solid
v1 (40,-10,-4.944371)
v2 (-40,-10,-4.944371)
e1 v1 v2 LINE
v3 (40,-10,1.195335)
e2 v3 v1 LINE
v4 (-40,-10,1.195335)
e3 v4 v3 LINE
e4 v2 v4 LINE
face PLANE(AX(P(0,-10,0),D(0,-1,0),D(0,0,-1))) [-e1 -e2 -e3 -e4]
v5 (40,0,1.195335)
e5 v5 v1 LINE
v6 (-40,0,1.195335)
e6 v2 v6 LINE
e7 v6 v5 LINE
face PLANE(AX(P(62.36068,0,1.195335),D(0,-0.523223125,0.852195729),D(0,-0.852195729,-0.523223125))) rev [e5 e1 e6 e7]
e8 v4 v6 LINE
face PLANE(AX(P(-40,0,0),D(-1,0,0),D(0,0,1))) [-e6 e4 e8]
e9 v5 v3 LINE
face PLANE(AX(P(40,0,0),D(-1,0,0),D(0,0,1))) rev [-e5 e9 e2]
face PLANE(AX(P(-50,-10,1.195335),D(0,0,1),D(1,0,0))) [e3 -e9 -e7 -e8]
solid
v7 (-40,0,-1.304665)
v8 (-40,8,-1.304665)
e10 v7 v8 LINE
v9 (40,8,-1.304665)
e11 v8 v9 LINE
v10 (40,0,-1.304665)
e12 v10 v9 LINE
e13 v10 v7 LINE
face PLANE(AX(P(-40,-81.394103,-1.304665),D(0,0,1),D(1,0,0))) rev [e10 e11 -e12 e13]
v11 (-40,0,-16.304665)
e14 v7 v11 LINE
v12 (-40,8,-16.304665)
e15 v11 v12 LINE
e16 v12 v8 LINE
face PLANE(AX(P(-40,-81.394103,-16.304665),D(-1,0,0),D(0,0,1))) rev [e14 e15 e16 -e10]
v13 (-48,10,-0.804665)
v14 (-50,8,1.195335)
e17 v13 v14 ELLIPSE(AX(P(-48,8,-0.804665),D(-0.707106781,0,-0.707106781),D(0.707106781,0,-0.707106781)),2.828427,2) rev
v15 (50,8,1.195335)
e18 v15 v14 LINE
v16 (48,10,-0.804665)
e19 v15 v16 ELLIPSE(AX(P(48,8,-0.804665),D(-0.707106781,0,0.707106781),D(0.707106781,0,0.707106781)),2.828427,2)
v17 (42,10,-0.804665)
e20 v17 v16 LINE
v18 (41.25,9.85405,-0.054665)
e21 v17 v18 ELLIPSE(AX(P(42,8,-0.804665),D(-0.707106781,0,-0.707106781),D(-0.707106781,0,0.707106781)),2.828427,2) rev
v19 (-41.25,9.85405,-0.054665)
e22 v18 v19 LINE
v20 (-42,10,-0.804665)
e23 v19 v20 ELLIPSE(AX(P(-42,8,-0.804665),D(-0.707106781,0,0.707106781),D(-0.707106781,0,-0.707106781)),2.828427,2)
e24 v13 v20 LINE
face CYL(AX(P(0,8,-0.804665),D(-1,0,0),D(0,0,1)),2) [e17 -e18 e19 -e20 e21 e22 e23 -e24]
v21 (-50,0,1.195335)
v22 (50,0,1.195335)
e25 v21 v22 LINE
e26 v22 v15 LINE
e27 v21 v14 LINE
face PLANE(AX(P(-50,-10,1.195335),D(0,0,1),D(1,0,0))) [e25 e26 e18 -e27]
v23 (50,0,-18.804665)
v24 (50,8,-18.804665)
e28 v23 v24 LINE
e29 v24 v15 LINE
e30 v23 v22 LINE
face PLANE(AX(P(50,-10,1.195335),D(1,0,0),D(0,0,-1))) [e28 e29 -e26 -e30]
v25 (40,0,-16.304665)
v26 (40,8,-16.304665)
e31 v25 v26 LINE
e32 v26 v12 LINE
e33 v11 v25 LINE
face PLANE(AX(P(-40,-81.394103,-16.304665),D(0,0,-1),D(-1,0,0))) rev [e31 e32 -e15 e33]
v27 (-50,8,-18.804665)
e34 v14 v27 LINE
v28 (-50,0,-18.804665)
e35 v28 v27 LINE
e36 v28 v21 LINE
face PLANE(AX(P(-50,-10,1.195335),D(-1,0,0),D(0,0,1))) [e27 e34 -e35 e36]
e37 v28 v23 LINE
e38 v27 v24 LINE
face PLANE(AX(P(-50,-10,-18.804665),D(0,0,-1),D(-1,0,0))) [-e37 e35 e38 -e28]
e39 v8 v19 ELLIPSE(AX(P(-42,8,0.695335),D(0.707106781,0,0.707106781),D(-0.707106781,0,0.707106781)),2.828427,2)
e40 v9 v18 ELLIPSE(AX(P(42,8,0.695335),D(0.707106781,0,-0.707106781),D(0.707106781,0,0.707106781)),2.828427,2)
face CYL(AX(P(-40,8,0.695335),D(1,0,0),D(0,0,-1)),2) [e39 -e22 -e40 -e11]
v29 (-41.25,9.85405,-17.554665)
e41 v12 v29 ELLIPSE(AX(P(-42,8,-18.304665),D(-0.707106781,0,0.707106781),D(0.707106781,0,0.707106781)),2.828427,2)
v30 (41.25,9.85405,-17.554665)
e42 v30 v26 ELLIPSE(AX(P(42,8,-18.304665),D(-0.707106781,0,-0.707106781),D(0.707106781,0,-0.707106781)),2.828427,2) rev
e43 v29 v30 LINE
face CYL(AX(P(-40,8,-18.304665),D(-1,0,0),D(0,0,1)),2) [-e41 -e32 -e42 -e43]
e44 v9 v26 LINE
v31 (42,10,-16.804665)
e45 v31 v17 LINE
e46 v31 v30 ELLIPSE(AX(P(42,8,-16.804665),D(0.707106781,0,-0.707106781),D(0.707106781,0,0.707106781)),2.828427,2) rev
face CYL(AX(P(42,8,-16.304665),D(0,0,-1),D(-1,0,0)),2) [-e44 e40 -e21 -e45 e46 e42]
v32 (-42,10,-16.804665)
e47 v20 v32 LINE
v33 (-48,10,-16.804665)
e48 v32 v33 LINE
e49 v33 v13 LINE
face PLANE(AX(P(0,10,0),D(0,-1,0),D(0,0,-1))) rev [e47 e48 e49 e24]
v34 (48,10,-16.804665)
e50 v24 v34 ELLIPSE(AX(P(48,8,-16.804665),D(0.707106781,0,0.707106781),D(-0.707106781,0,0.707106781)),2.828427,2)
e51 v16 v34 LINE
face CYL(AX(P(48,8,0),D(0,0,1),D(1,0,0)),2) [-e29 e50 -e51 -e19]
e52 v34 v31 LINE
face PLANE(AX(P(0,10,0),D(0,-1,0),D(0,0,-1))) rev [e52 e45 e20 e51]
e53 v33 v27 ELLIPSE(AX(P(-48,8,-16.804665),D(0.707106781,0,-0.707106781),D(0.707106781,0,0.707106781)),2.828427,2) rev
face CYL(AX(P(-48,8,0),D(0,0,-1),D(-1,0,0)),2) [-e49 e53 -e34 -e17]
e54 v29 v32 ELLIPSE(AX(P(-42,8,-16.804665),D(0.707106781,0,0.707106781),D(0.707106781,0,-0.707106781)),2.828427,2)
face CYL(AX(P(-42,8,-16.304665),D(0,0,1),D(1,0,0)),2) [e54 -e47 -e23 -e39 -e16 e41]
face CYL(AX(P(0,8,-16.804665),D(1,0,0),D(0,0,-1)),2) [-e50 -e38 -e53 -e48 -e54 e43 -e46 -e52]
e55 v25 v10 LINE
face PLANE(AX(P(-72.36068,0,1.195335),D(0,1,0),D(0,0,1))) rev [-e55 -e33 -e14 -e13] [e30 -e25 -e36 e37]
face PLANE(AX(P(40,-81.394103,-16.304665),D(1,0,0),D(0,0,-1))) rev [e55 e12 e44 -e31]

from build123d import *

# Parameters (mm, degrees)
BOSS_EXTRUDE1_DEPTH      = 10
BOSS_EXTRUDE1_DEPTH_BACK = 10
SKETCH1_W                = 100
SKETCH1_H                = 20
CUT_EXTRUDE1_DEPTH       = 100
SKETCH3_W                = 80
SKETCH3_H                = 15
CUT_EXTRUDE2_DEPTH       = 10
FILLET3_R                = 2
CUT_EXTRUDE4_DEPTH       = 10
CUT_EXTRUDE5_DEPTH       = 10
CUT_EXTRUDE6_DEPTH       = 80


with BuildPart() as part:
    # Sketch1 → Boss-Extrude1 (new, two sides: drawn at the far end of the back side and taken through both)
    with BuildSketch(Plane(origin=(0, 0, 0), x_dir=(1, 0, 0), z_dir=(0, 1, 0)).offset(-BOSS_EXTRUDE1_DEPTH_BACK)):
        with Locations((0, 8.804664723)):
            Rectangle(SKETCH1_W, SKETCH1_H)
    extrude(amount=BOSS_EXTRUDE1_DEPTH + BOSS_EXTRUDE1_DEPTH_BACK)

    # Sketch2 → Cut-Extrude1 (cut)
    with BuildSketch(Plane(origin=(50, 0, 0), x_dir=(0, 0, -1), z_dir=(1, 0, 0))):
        Polygon((-1.195335277, 0), (18.804664723, 0), (18.804664723, -10), align=None)
    extrude(amount=-CUT_EXTRUDE1_DEPTH, mode=Mode.SUBTRACT)


with BuildPart() as cut_extrude1_piece_1:
    # of the separate pieces the step leaves, piece 1, a body of its own (cut_extrude1_pieces)
    add(part.part.solids().sort_by_distance((-50, 10, 1.195335277))[0])

    # Sketch3 → Cut-Extrude2 (cut)
    with BuildSketch(Plane(origin=(0, 10, 0), x_dir=(1, 0, 0), z_dir=(0, 1, 0))):
        with Locations((0, 8.804664723)):
            Rectangle(SKETCH3_W, SKETCH3_H)
    extrude(amount=-CUT_EXTRUDE2_DEPTH, mode=Mode.SUBTRACT)

    # Fillet3
    # the kernel refuses this fillet: 2 mm, written as the material it takes off along each edge
    with BuildSketch(Plane(origin=(40, 10, -16.304664723), x_dir=(1, 0, 0), z_dir=(0, 0, 1)), Plane(origin=(-40, 10, -1.304664723), x_dir=(-1, 0, 0), z_dir=(0, 0, -1))) as fillet3_piece_1:
        with BuildLine():
            CenterArc((FILLET3_R, -FILLET3_R), FILLET3_R, 90, 90)
            Line((0, -FILLET3_R), (-FILLET3_R * 0.02, -FILLET3_R))
            Line((-FILLET3_R * 0.02, -FILLET3_R), (-FILLET3_R * 0.02, FILLET3_R * 0.02))
            Line((-FILLET3_R * 0.02, FILLET3_R * 0.02), (FILLET3_R, FILLET3_R * 0.02))
            Line((FILLET3_R, FILLET3_R * 0.02), (FILLET3_R, 0))
        make_face()
    extrude(amount=15, mode=Mode.SUBTRACT)
    with BuildSketch(Plane(origin=(-40, 10, -16.304664723), x_dir=(0, 0, -1), z_dir=(1, 0, 0)), Plane(origin=(40, 10, -1.304664723), x_dir=(0, 0, 1), z_dir=(-1, 0, 0))) as fillet3_piece_2:
        with BuildLine():
            CenterArc((FILLET3_R, -FILLET3_R), FILLET3_R, 90, 90)
            Line((0, -FILLET3_R), (-FILLET3_R * 0.02, -FILLET3_R))
            Line((-FILLET3_R * 0.02, -FILLET3_R), (-FILLET3_R * 0.02, FILLET3_R * 0.02))
            Line((-FILLET3_R * 0.02, FILLET3_R * 0.02), (FILLET3_R, FILLET3_R * 0.02))
            Line((FILLET3_R, FILLET3_R * 0.02), (FILLET3_R, 0))
        make_face()
    extrude(amount=80, mode=Mode.SUBTRACT)
    with BuildSketch(Plane(origin=(50, 10, 1.195335277), x_dir=(0, -1, 0), z_dir=(0, 0, -1)), Plane(origin=(-50, 10, -18.804664723), x_dir=(0, -1, 0), z_dir=(0, 0, 1))) as fillet3_piece_3:
        with BuildLine():
            CenterArc((FILLET3_R, FILLET3_R), FILLET3_R, 180, 90)
            Line((0, FILLET3_R), (-FILLET3_R * 0.02, FILLET3_R))
            Line((-FILLET3_R * 0.02, FILLET3_R), (-FILLET3_R * 0.02, -FILLET3_R * 0.02))
            Line((-FILLET3_R * 0.02, -FILLET3_R * 0.02), (FILLET3_R, -FILLET3_R * 0.02))
            Line((FILLET3_R, -FILLET3_R * 0.02), (FILLET3_R, 0))
        make_face()
    extrude(amount=20, mode=Mode.SUBTRACT)
    with BuildSketch(Plane(origin=(50, 10, -18.804664723), x_dir=(0, 0, 1), z_dir=(-1, 0, 0))) as fillet3_piece_4:
        with BuildLine():
            CenterArc((FILLET3_R, -FILLET3_R), FILLET3_R, 90, 90)
            Line((0, -FILLET3_R), (-FILLET3_R * 0.02, -FILLET3_R))
            Line((-FILLET3_R * 0.02, -FILLET3_R), (-FILLET3_R * 0.02, FILLET3_R * 0.02))
            Line((-FILLET3_R * 0.02, FILLET3_R * 0.02), (FILLET3_R, FILLET3_R * 0.02))
            Line((FILLET3_R, FILLET3_R * 0.02), (FILLET3_R, 0))
        make_face()
    extrude(amount=100, mode=Mode.SUBTRACT)
    with BuildSketch(Plane(origin=(-50, 10, 1.195335277), x_dir=(0, -1, 0), z_dir=(1, 0, 0))) as fillet3_piece_5:
        with BuildLine():
            CenterArc((FILLET3_R, FILLET3_R), FILLET3_R, 180, 90)
            Line((0, FILLET3_R), (-FILLET3_R * 0.02, FILLET3_R))
            Line((-FILLET3_R * 0.02, FILLET3_R), (-FILLET3_R * 0.02, -FILLET3_R * 0.02))
            Line((-FILLET3_R * 0.02, -FILLET3_R * 0.02), (FILLET3_R, -FILLET3_R * 0.02))
            Line((FILLET3_R, -FILLET3_R * 0.02), (FILLET3_R, 0))
        make_face()
    extrude(amount=100, mode=Mode.SUBTRACT)
    with BuildSketch(Plane(origin=(40, 10, -21.304664723), x_dir=(1, 0, 0), z_dir=(0, 0, 1))) as fillet3_piece_6a_section:
        with BuildLine():
            CenterArc((FILLET3_R, -FILLET3_R), FILLET3_R, 90, 90)
            Line((0, -FILLET3_R), (-FILLET3_R * 0.02, -FILLET3_R))
            Line((-FILLET3_R * 0.02, -FILLET3_R), (-FILLET3_R * 0.02, FILLET3_R * 0.02))
            Line((-FILLET3_R * 0.02, FILLET3_R * 0.02), (FILLET3_R, FILLET3_R * 0.02))
            Line((FILLET3_R, FILLET3_R * 0.02), (FILLET3_R, 0))
        make_face()
    fillet3_piece_6a = extrude(amount=20, mode=Mode.PRIVATE)
    fillet3_piece_6a = split(fillet3_piece_6a, bisect_by=Plane(origin=(40.452790229, 9.547209771, -16.304664723), z_dir=(0, 0, -1)), keep=Keep.TOP, mode=Mode.PRIVATE)
    with BuildSketch(Plane(origin=(-40, 10, -16.304664723), x_dir=(0, 0, -1), z_dir=(1, 0, 0))) as fillet3_piece_6b_section:
        with BuildLine():
            CenterArc((FILLET3_R, -FILLET3_R), FILLET3_R, 90, 90)
            Line((0, -FILLET3_R), (-FILLET3_R * 0.02, -FILLET3_R))
            Line((-FILLET3_R * 0.02, -FILLET3_R), (-FILLET3_R * 0.02, FILLET3_R * 0.02))
            Line((-FILLET3_R * 0.02, FILLET3_R * 0.02), (FILLET3_R, FILLET3_R * 0.02))
            Line((FILLET3_R, FILLET3_R * 0.02), (FILLET3_R, 0))
        make_face()
    fillet3_piece_6b = extrude(amount=85, mode=Mode.PRIVATE)
    fillet3_piece_6b = split(fillet3_piece_6b, bisect_by=Plane(origin=(40, 9.547209771, -16.757454952), z_dir=(1, 0, 0)), keep=Keep.TOP, mode=Mode.PRIVATE)
    fillet3_piece_6 = fillet3_piece_6a & fillet3_piece_6b
    add(fillet3_piece_6, mode=Mode.SUBTRACT)
    with BuildSketch(Plane(origin=(45, 10, -1.304664723), x_dir=(0, 0, 1), z_dir=(-1, 0, 0))) as fillet3_piece_7a_section:
        with BuildLine():
            CenterArc((FILLET3_R, -FILLET3_R), FILLET3_R, 90, 90)
            Line((0, -FILLET3_R), (-FILLET3_R * 0.02, -FILLET3_R))
            Line((-FILLET3_R * 0.02, -FILLET3_R), (-FILLET3_R * 0.02, FILLET3_R * 0.02))
            Line((-FILLET3_R * 0.02, FILLET3_R * 0.02), (FILLET3_R, FILLET3_R * 0.02))
            Line((FILLET3_R, FILLET3_R * 0.02), (FILLET3_R, 0))
        make_face()
    fillet3_piece_7a = extrude(amount=85, mode=Mode.PRIVATE)
    fillet3_piece_7a = split(fillet3_piece_7a, bisect_by=Plane(origin=(40, 9.547209771, -0.851874494), z_dir=(1, 0, 0)), keep=Keep.TOP, mode=Mode.PRIVATE)
    with BuildSketch(Plane(origin=(40, 10, -16.304664723), x_dir=(1, 0, 0), z_dir=(0, 0, 1))) as fillet3_piece_7b_section:
        with BuildLine():
            CenterArc((FILLET3_R, -FILLET3_R), FILLET3_R, 90, 90)
            Line((0, -FILLET3_R), (-FILLET3_R * 0.02, -FILLET3_R))
            Line((-FILLET3_R * 0.02, -FILLET3_R), (-FILLET3_R * 0.02, FILLET3_R * 0.02))
            Line((-FILLET3_R * 0.02, FILLET3_R * 0.02), (FILLET3_R, FILLET3_R * 0.02))
            Line((FILLET3_R, FILLET3_R * 0.02), (FILLET3_R, 0))
        make_face()
    fillet3_piece_7b = extrude(amount=20, mode=Mode.PRIVATE)
    fillet3_piece_7b = split(fillet3_piece_7b, bisect_by=Plane(origin=(40.452790229, 9.547209771, -1.304664723), z_dir=(0, 0, 1)), keep=Keep.TOP, mode=Mode.PRIVATE)
    fillet3_piece_7 = fillet3_piece_7a & fillet3_piece_7b
    add(fillet3_piece_7, mode=Mode.SUBTRACT)
    with BuildSketch(Plane(origin=(-40, 10, -1.304664723), x_dir=(-1, 0, 0), z_dir=(0, 0, -1))) as fillet3_piece_8a_section:
        with BuildLine():
            CenterArc((FILLET3_R, -FILLET3_R), FILLET3_R, 90, 90)
            Line((0, -FILLET3_R), (-FILLET3_R * 0.02, -FILLET3_R))
            Line((-FILLET3_R * 0.02, -FILLET3_R), (-FILLET3_R * 0.02, FILLET3_R * 0.02))
            Line((-FILLET3_R * 0.02, FILLET3_R * 0.02), (FILLET3_R, FILLET3_R * 0.02))
            Line((FILLET3_R, FILLET3_R * 0.02), (FILLET3_R, 0))
        make_face()
    fillet3_piece_8a = extrude(amount=20, mode=Mode.PRIVATE)
    fillet3_piece_8a = split(fillet3_piece_8a, bisect_by=Plane(origin=(-40.452790229, 9.547209771, -16.304664723), z_dir=(0, 0, -1)), keep=Keep.TOP, mode=Mode.PRIVATE)
    with BuildSketch(Plane(origin=(-45, 10, -16.304664723), x_dir=(0, 0, -1), z_dir=(1, 0, 0))) as fillet3_piece_8b_section:
        with BuildLine():
            CenterArc((FILLET3_R, -FILLET3_R), FILLET3_R, 90, 90)
            Line((0, -FILLET3_R), (-FILLET3_R * 0.02, -FILLET3_R))
            Line((-FILLET3_R * 0.02, -FILLET3_R), (-FILLET3_R * 0.02, FILLET3_R * 0.02))
            Line((-FILLET3_R * 0.02, FILLET3_R * 0.02), (FILLET3_R, FILLET3_R * 0.02))
            Line((FILLET3_R, FILLET3_R * 0.02), (FILLET3_R, 0))
        make_face()
    fillet3_piece_8b = extrude(amount=85, mode=Mode.PRIVATE)
    fillet3_piece_8b = split(fillet3_piece_8b, bisect_by=Plane(origin=(-40, 9.547209771, -16.757454952), z_dir=(-1, 0, 0)), keep=Keep.TOP, mode=Mode.PRIVATE)
    fillet3_piece_8 = fillet3_piece_8a & fillet3_piece_8b
    add(fillet3_piece_8, mode=Mode.SUBTRACT)
    with BuildSketch(Plane(origin=(-40, 10, 3.695335277), x_dir=(-1, 0, 0), z_dir=(0, 0, -1))) as fillet3_piece_9a_section:
        with BuildLine():
            CenterArc((FILLET3_R, -FILLET3_R), FILLET3_R, 90, 90)
            Line((0, -FILLET3_R), (-FILLET3_R * 0.02, -FILLET3_R))
            Line((-FILLET3_R * 0.02, -FILLET3_R), (-FILLET3_R * 0.02, FILLET3_R * 0.02))
            Line((-FILLET3_R * 0.02, FILLET3_R * 0.02), (FILLET3_R, FILLET3_R * 0.02))
            Line((FILLET3_R, FILLET3_R * 0.02), (FILLET3_R, 0))
        make_face()
    fillet3_piece_9a = extrude(amount=20, mode=Mode.PRIVATE)
    fillet3_piece_9a = split(fillet3_piece_9a, bisect_by=Plane(origin=(-40.452790229, 9.547209771, -1.304664723), z_dir=(0, 0, 1)), keep=Keep.TOP, mode=Mode.PRIVATE)
    with BuildSketch(Plane(origin=(40, 10, -1.304664723), x_dir=(0, 0, 1), z_dir=(-1, 0, 0))) as fillet3_piece_9b_section:
        with BuildLine():
            CenterArc((FILLET3_R, -FILLET3_R), FILLET3_R, 90, 90)
            Line((0, -FILLET3_R), (-FILLET3_R * 0.02, -FILLET3_R))
            Line((-FILLET3_R * 0.02, -FILLET3_R), (-FILLET3_R * 0.02, FILLET3_R * 0.02))
            Line((-FILLET3_R * 0.02, FILLET3_R * 0.02), (FILLET3_R, FILLET3_R * 0.02))
            Line((FILLET3_R, FILLET3_R * 0.02), (FILLET3_R, 0))
        make_face()
    fillet3_piece_9b = extrude(amount=85, mode=Mode.PRIVATE)
    fillet3_piece_9b = split(fillet3_piece_9b, bisect_by=Plane(origin=(-40, 9.547209771, -0.851874494), z_dir=(-1, 0, 0)), keep=Keep.TOP, mode=Mode.PRIVATE)
    fillet3_piece_9 = fillet3_piece_9a & fillet3_piece_9b
    add(fillet3_piece_9, mode=Mode.SUBTRACT)
    with BuildSketch(Plane(origin=(-50, 10, 1.195335277), x_dir=(0, -1, 0), z_dir=(1, 0, 0))) as fillet3_piece_10a_section:
        with BuildLine():
            CenterArc((FILLET3_R, FILLET3_R), FILLET3_R, 180, 90)
            Line((0, FILLET3_R), (-FILLET3_R * 0.02, FILLET3_R))
            Line((-FILLET3_R * 0.02, FILLET3_R), (-FILLET3_R * 0.02, -FILLET3_R * 0.02))
            Line((-FILLET3_R * 0.02, -FILLET3_R * 0.02), (FILLET3_R, -FILLET3_R * 0.02))
            Line((FILLET3_R, -FILLET3_R * 0.02), (FILLET3_R, 0))
        make_face()
    fillet3_piece_10a = extrude(amount=105, mode=Mode.PRIVATE)
    fillet3_piece_10a = split(fillet3_piece_10a, bisect_by=Plane(origin=(50, 9.547209771, 0.742545048), z_dir=(1, 0, 0)), keep=Keep.TOP, mode=Mode.PRIVATE)
    with BuildSketch(Plane(origin=(50, 10, 6.195335277), x_dir=(0, -1, 0), z_dir=(0, 0, -1))) as fillet3_piece_10b_section:
        with BuildLine():
            CenterArc((FILLET3_R, FILLET3_R), FILLET3_R, 180, 90)
            Line((0, FILLET3_R), (-FILLET3_R * 0.02, FILLET3_R))
            Line((-FILLET3_R * 0.02, FILLET3_R), (-FILLET3_R * 0.02, -FILLET3_R * 0.02))
            Line((-FILLET3_R * 0.02, -FILLET3_R * 0.02), (FILLET3_R, -FILLET3_R * 0.02))
            Line((FILLET3_R, -FILLET3_R * 0.02), (FILLET3_R, 0))
        make_face()
    fillet3_piece_10b = extrude(amount=25, mode=Mode.PRIVATE)
    fillet3_piece_10b = split(fillet3_piece_10b, bisect_by=Plane(origin=(49.547209771, 9.547209771, 1.195335277), z_dir=(0, 0, 1)), keep=Keep.TOP, mode=Mode.PRIVATE)
    fillet3_piece_10 = fillet3_piece_10a & fillet3_piece_10b
    add(fillet3_piece_10, mode=Mode.SUBTRACT)
    with BuildSketch(Plane(origin=(50, 10, 1.195335277), x_dir=(0, -1, 0), z_dir=(0, 0, -1))) as fillet3_piece_11a_section:
        with BuildLine():
            CenterArc((FILLET3_R, FILLET3_R), FILLET3_R, 180, 90)
            Line((0, FILLET3_R), (-FILLET3_R * 0.02, FILLET3_R))
            Line((-FILLET3_R * 0.02, FILLET3_R), (-FILLET3_R * 0.02, -FILLET3_R * 0.02))
            Line((-FILLET3_R * 0.02, -FILLET3_R * 0.02), (FILLET3_R, -FILLET3_R * 0.02))
            Line((FILLET3_R, -FILLET3_R * 0.02), (FILLET3_R, 0))
        make_face()
    fillet3_piece_11a = extrude(amount=25, mode=Mode.PRIVATE)
    fillet3_piece_11a = split(fillet3_piece_11a, bisect_by=Plane(origin=(49.547209771, 9.547209771, -18.804664723), z_dir=(0, 0, -1)), keep=Keep.TOP, mode=Mode.PRIVATE)
    with BuildSketch(Plane(origin=(55, 10, -18.804664723), x_dir=(0, 0, 1), z_dir=(-1, 0, 0))) as fillet3_piece_11b_section:
        with BuildLine():
            CenterArc((FILLET3_R, -FILLET3_R), FILLET3_R, 90, 90)
            Line((0, -FILLET3_R), (-FILLET3_R * 0.02, -FILLET3_R))
            Line((-FILLET3_R * 0.02, -FILLET3_R), (-FILLET3_R * 0.02, FILLET3_R * 0.02))
            Line((-FILLET3_R * 0.02, FILLET3_R * 0.02), (FILLET3_R, FILLET3_R * 0.02))
            Line((FILLET3_R, FILLET3_R * 0.02), (FILLET3_R, 0))
        make_face()
    fillet3_piece_11b = extrude(amount=105, mode=Mode.PRIVATE)
    fillet3_piece_11b = split(fillet3_piece_11b, bisect_by=Plane(origin=(50, 9.547209771, -18.351874494), z_dir=(1, 0, 0)), keep=Keep.TOP, mode=Mode.PRIVATE)
    fillet3_piece_11 = fillet3_piece_11a & fillet3_piece_11b
    add(fillet3_piece_11, mode=Mode.SUBTRACT)
    with BuildSketch(Plane(origin=(-50, 10, -23.804664723), x_dir=(0, -1, 0), z_dir=(0, 0, 1))) as fillet3_piece_12a_section:
        with BuildLine():
            CenterArc((FILLET3_R, FILLET3_R), FILLET3_R, 180, 90)
            Line((0, FILLET3_R), (-FILLET3_R * 0.02, FILLET3_R))
            Line((-FILLET3_R * 0.02, FILLET3_R), (-FILLET3_R * 0.02, -FILLET3_R * 0.02))
            Line((-FILLET3_R * 0.02, -FILLET3_R * 0.02), (FILLET3_R, -FILLET3_R * 0.02))
            Line((FILLET3_R, -FILLET3_R * 0.02), (FILLET3_R, 0))
        make_face()
    fillet3_piece_12a = extrude(amount=25, mode=Mode.PRIVATE)
    fillet3_piece_12a = split(fillet3_piece_12a, bisect_by=Plane(origin=(-49.547209771, 9.547209771, -18.804664723), z_dir=(0, 0, -1)), keep=Keep.TOP, mode=Mode.PRIVATE)
    with BuildSketch(Plane(origin=(50, 10, -18.804664723), x_dir=(0, 0, 1), z_dir=(-1, 0, 0))) as fillet3_piece_12b_section:
        with BuildLine():
            CenterArc((FILLET3_R, -FILLET3_R), FILLET3_R, 90, 90)
            Line((0, -FILLET3_R), (-FILLET3_R * 0.02, -FILLET3_R))
            Line((-FILLET3_R * 0.02, -FILLET3_R), (-FILLET3_R * 0.02, FILLET3_R * 0.02))
            Line((-FILLET3_R * 0.02, FILLET3_R * 0.02), (FILLET3_R, FILLET3_R * 0.02))
            Line((FILLET3_R, FILLET3_R * 0.02), (FILLET3_R, 0))
        make_face()
    fillet3_piece_12b = extrude(amount=105, mode=Mode.PRIVATE)
    fillet3_piece_12b = split(fillet3_piece_12b, bisect_by=Plane(origin=(-50, 9.547209771, -18.351874494), z_dir=(-1, 0, 0)), keep=Keep.TOP, mode=Mode.PRIVATE)
    fillet3_piece_12 = fillet3_piece_12a & fillet3_piece_12b
    add(fillet3_piece_12, mode=Mode.SUBTRACT)
    with BuildSketch(Plane(origin=(-55, 10, 1.195335277), x_dir=(0, -1, 0), z_dir=(1, 0, 0))) as fillet3_piece_13a_section:
        with BuildLine():
            CenterArc((FILLET3_R, FILLET3_R), FILLET3_R, 180, 90)
            Line((0, FILLET3_R), (-FILLET3_R * 0.02, FILLET3_R))
            Line((-FILLET3_R * 0.02, FILLET3_R), (-FILLET3_R * 0.02, -FILLET3_R * 0.02))
            Line((-FILLET3_R * 0.02, -FILLET3_R * 0.02), (FILLET3_R, -FILLET3_R * 0.02))
            Line((FILLET3_R, -FILLET3_R * 0.02), (FILLET3_R, 0))
        make_face()
    fillet3_piece_13a = extrude(amount=105, mode=Mode.PRIVATE)
    fillet3_piece_13a = split(fillet3_piece_13a, bisect_by=Plane(origin=(-50, 9.547209771, 0.742545048), z_dir=(-1, 0, 0)), keep=Keep.TOP, mode=Mode.PRIVATE)
    with BuildSketch(Plane(origin=(-50, 10, -18.804664723), x_dir=(0, -1, 0), z_dir=(0, 0, 1))) as fillet3_piece_13b_section:
        with BuildLine():
            CenterArc((FILLET3_R, FILLET3_R), FILLET3_R, 180, 90)
            Line((0, FILLET3_R), (-FILLET3_R * 0.02, FILLET3_R))
            Line((-FILLET3_R * 0.02, FILLET3_R), (-FILLET3_R * 0.02, -FILLET3_R * 0.02))
            Line((-FILLET3_R * 0.02, -FILLET3_R * 0.02), (FILLET3_R, -FILLET3_R * 0.02))
            Line((FILLET3_R, -FILLET3_R * 0.02), (FILLET3_R, 0))
        make_face()
    fillet3_piece_13b = extrude(amount=25, mode=Mode.PRIVATE)
    fillet3_piece_13b = split(fillet3_piece_13b, bisect_by=Plane(origin=(-49.547209771, 9.547209771, 1.195335277), z_dir=(0, 0, 1)), keep=Keep.TOP, mode=Mode.PRIVATE)
    fillet3_piece_13 = fillet3_piece_13a & fillet3_piece_13b
    add(fillet3_piece_13, mode=Mode.SUBTRACT)


with BuildPart() as cut_extrude1_piece_2:
    # of the separate pieces the step leaves, piece 2, a body of its own (cut_extrude1_pieces)
    add(part.part.solids().sort_by_distance((-50, -10, 1.195335277))[0])

    # Sketch4 → Cut-Extrude4 (cut)
    with BuildSketch(Plane.ZY.offset(50)):
        Polygon((1.195335277, -10), (1.195335277, 0), (-18.804664723, -10), align=None)
    extrude(amount=-CUT_EXTRUDE4_DEPTH, mode=Mode.SUBTRACT)

    # Sketch5 → Cut-Extrude5 (cut)
    with BuildSketch(Plane(origin=(50, 0, 0), x_dir=(0, 0, -1), z_dir=(1, 0, 0))):
        Polygon((-1.195335277, -10), (-1.195335277, 0), (18.804664723, -10), align=None)
    extrude(amount=-CUT_EXTRUDE5_DEPTH, mode=Mode.SUBTRACT)

    # Sketch6 → Cut-Extrude6 (cut)
    with BuildSketch(Plane.ZY.offset(40)):
        Polygon((1.195335277, 0), (-4.944370746, -10), (-18.804664723, -10), align=None)
    extrude(amount=-CUT_EXTRUDE6_DEPTH, mode=Mode.SUBTRACT)


solid = Compound([cut_extrude1_piece_1.part, cut_extrude1_piece_2.part])
